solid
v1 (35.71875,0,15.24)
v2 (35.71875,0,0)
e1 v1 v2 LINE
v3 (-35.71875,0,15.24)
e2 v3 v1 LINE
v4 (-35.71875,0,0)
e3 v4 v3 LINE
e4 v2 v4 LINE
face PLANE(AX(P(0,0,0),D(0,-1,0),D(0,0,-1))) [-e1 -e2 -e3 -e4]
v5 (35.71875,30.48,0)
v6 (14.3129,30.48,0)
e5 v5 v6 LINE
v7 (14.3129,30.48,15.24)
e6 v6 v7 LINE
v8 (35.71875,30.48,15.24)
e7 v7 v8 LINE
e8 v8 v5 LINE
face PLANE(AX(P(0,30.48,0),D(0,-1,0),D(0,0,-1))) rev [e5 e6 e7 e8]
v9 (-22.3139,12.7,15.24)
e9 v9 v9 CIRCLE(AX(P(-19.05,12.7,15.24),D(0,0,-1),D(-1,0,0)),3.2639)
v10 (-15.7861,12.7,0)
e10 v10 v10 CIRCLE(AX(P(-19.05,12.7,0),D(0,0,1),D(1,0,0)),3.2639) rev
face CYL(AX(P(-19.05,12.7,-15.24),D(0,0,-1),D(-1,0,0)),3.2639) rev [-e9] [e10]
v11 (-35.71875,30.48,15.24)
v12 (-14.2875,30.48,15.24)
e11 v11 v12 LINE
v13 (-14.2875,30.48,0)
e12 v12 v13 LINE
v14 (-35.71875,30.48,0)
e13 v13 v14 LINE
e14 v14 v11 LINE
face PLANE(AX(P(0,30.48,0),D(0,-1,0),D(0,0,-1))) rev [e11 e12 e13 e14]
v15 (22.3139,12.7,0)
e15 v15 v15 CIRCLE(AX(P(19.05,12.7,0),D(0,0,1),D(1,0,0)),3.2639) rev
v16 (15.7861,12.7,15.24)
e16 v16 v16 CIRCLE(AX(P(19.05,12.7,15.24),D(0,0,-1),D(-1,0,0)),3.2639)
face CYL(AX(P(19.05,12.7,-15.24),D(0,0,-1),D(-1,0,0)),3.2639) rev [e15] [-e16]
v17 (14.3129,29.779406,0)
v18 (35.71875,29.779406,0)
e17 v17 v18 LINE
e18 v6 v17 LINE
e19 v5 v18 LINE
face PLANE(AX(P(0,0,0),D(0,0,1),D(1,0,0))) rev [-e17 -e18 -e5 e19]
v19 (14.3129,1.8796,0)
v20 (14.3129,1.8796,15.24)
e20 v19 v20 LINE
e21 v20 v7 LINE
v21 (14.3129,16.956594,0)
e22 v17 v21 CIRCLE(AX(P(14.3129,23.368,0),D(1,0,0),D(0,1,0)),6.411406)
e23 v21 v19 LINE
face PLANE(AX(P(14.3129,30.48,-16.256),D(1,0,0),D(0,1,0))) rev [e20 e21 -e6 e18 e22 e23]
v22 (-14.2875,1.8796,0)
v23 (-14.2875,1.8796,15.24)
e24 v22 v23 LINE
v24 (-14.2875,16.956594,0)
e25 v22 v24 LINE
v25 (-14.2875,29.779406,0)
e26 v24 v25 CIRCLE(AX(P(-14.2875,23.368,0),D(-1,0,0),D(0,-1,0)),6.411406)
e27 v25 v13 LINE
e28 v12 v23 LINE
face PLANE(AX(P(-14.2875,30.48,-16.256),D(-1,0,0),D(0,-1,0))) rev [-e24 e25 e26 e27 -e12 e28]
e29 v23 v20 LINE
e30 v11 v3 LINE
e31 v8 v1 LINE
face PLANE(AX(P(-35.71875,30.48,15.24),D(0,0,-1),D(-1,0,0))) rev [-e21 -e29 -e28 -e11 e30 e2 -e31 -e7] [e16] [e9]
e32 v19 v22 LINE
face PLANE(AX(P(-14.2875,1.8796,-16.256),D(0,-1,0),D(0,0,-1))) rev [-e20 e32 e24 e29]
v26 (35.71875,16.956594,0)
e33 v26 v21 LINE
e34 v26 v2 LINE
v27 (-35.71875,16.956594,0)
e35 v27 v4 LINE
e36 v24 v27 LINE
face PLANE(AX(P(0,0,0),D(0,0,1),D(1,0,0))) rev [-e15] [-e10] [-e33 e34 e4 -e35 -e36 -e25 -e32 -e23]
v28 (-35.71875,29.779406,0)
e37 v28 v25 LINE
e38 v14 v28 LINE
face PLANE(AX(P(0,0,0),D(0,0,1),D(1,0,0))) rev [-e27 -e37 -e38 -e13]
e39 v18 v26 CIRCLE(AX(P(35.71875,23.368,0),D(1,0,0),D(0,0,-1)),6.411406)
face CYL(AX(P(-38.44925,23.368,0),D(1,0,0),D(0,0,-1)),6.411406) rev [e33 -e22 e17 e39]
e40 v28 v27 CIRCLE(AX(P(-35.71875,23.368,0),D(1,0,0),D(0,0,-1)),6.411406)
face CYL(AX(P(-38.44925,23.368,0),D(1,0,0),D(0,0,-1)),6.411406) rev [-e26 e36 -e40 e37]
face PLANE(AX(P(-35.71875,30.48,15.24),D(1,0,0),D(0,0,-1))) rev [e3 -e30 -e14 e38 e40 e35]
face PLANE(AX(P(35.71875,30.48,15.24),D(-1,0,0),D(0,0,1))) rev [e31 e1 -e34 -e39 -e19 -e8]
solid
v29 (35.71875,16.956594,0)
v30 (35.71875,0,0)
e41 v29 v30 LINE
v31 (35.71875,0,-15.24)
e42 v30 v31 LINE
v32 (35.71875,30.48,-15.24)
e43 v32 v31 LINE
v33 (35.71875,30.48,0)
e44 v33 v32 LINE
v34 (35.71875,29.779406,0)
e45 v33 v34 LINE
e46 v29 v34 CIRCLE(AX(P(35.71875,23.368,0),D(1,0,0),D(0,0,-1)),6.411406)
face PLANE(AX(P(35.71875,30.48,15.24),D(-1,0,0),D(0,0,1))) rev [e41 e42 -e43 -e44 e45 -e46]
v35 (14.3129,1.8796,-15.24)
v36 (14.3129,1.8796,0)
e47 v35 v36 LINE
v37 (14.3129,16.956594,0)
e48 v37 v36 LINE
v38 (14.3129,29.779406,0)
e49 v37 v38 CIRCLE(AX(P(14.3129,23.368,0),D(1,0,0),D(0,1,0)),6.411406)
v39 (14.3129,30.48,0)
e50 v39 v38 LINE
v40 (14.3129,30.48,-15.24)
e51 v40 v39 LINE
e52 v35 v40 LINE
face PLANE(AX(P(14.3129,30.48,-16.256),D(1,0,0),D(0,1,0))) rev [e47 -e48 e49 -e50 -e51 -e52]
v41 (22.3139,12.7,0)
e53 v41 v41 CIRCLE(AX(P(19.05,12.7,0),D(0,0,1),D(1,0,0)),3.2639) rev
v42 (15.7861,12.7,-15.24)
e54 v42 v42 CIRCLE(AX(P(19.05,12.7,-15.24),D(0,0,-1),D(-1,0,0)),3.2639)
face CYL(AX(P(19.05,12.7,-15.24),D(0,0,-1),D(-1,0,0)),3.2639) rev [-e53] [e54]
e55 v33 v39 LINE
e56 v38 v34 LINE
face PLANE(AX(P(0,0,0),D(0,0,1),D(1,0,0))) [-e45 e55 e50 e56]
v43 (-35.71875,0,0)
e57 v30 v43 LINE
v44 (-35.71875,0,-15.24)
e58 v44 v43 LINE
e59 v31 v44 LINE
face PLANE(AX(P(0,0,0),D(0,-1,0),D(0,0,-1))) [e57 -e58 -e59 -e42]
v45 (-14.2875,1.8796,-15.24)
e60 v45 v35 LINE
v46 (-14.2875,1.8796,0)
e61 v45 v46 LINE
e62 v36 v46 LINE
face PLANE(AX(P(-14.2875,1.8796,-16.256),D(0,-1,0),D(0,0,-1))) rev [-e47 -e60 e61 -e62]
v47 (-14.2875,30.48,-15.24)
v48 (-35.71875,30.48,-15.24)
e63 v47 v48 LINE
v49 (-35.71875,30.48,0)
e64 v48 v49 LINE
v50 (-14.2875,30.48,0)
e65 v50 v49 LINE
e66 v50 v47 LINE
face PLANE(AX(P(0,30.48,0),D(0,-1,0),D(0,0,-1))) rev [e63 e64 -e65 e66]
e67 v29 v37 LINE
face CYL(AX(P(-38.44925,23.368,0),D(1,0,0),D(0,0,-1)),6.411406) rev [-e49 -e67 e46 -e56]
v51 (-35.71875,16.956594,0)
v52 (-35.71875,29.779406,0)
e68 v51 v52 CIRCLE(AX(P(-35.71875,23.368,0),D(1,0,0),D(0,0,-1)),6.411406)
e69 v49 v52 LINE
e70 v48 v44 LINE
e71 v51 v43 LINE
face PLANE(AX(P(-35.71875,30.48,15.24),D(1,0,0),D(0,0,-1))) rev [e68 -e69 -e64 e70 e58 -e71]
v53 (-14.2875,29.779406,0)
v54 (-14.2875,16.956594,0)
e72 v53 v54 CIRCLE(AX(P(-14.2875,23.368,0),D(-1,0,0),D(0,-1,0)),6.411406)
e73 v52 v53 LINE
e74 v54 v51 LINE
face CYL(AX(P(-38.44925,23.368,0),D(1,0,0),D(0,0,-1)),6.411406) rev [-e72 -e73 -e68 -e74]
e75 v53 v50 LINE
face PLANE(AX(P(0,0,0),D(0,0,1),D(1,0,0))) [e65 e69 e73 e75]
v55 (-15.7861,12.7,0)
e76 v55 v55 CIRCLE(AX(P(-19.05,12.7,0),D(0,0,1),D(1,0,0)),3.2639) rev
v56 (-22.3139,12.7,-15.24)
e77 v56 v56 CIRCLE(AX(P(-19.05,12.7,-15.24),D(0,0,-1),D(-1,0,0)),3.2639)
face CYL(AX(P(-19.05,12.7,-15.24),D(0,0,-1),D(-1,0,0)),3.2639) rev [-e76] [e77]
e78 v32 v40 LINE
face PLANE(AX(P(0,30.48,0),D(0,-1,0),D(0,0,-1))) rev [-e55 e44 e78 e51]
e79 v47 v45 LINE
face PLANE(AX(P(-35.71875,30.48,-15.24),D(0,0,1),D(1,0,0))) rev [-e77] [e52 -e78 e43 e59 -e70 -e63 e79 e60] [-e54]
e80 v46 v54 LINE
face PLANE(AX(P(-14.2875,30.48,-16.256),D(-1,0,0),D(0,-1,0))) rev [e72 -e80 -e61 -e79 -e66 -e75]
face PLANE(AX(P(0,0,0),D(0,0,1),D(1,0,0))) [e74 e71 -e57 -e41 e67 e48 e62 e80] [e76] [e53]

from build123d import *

# Parameters (mm, degrees)
SKETCH1_W                = 71.4375
SKETCH1_H                = 30.48
BOSS_EXTRUDE1_DEPTH      = 30.48
SKETCH4_W                = 28.6004
SKETCH4_H                = 28.6004
CUT_EXTRUDE1_DEPTH       = 31.496
SKETCH9_R                = 6.41140629
CUT_EXTRUDE2_DEPTH       = 74.168
F_5_16_18_TAPPED_HOLE1_D = 6.5278


# Read off the part's stored shape, not the designer's step: Split3
with BuildPart() as part:
    # Sketch1 → Boss-Extrude1 (new body)
    with BuildSketch(Plane(origin=(0, 0, 0), x_dir=(1, 0, 0), z_dir=(0, 1, 0))):
        Rectangle(SKETCH1_W, SKETCH1_H)
    extrude(amount=BOSS_EXTRUDE1_DEPTH)

    # Sketch4 → Cut-Extrude1 (cut)
    with BuildSketch(Plane.XY.offset(15.24)):
        with Locations((0.0127, 16.1798)):
            Rectangle(SKETCH4_W, SKETCH4_H)
    extrude(amount=-CUT_EXTRUDE1_DEPTH, mode=Mode.SUBTRACT)

    # Sketch9 → Cut-Extrude2 (cut)
    with BuildSketch(Plane(origin=(35.71875, 0, 0), x_dir=(0, 0, -1), z_dir=(1, 0, 0))):
        with Locations((0, 23.368)):
            Circle(SKETCH9_R)
    extrude(amount=-CUT_EXTRUDE2_DEPTH, mode=Mode.SUBTRACT)

    # 5/16-18 Tapped Hole1 (through all)
    with Locations(Plane(origin=(0, 0, -15.24), x_dir=(-1, 0, 0), z_dir=(0, 0, -1))):
        with Locations((-19.05, 12.7), (19.05, 12.7)):
            Hole(F_5_16_18_TAPPED_HOLE1_D / 2)


with BuildPart() as body_2:
    # Split3: the piece on the far side of the plane
    add(part.part)
    split(bisect_by=Plane.XY, keep=Keep.BOTTOM)


with BuildPart() as part_1:
    add(part.part)

    # Split3
    split(bisect_by=Plane.XY, keep=Keep.TOP)


solid = Compound([body_2.part, part_1.part])
